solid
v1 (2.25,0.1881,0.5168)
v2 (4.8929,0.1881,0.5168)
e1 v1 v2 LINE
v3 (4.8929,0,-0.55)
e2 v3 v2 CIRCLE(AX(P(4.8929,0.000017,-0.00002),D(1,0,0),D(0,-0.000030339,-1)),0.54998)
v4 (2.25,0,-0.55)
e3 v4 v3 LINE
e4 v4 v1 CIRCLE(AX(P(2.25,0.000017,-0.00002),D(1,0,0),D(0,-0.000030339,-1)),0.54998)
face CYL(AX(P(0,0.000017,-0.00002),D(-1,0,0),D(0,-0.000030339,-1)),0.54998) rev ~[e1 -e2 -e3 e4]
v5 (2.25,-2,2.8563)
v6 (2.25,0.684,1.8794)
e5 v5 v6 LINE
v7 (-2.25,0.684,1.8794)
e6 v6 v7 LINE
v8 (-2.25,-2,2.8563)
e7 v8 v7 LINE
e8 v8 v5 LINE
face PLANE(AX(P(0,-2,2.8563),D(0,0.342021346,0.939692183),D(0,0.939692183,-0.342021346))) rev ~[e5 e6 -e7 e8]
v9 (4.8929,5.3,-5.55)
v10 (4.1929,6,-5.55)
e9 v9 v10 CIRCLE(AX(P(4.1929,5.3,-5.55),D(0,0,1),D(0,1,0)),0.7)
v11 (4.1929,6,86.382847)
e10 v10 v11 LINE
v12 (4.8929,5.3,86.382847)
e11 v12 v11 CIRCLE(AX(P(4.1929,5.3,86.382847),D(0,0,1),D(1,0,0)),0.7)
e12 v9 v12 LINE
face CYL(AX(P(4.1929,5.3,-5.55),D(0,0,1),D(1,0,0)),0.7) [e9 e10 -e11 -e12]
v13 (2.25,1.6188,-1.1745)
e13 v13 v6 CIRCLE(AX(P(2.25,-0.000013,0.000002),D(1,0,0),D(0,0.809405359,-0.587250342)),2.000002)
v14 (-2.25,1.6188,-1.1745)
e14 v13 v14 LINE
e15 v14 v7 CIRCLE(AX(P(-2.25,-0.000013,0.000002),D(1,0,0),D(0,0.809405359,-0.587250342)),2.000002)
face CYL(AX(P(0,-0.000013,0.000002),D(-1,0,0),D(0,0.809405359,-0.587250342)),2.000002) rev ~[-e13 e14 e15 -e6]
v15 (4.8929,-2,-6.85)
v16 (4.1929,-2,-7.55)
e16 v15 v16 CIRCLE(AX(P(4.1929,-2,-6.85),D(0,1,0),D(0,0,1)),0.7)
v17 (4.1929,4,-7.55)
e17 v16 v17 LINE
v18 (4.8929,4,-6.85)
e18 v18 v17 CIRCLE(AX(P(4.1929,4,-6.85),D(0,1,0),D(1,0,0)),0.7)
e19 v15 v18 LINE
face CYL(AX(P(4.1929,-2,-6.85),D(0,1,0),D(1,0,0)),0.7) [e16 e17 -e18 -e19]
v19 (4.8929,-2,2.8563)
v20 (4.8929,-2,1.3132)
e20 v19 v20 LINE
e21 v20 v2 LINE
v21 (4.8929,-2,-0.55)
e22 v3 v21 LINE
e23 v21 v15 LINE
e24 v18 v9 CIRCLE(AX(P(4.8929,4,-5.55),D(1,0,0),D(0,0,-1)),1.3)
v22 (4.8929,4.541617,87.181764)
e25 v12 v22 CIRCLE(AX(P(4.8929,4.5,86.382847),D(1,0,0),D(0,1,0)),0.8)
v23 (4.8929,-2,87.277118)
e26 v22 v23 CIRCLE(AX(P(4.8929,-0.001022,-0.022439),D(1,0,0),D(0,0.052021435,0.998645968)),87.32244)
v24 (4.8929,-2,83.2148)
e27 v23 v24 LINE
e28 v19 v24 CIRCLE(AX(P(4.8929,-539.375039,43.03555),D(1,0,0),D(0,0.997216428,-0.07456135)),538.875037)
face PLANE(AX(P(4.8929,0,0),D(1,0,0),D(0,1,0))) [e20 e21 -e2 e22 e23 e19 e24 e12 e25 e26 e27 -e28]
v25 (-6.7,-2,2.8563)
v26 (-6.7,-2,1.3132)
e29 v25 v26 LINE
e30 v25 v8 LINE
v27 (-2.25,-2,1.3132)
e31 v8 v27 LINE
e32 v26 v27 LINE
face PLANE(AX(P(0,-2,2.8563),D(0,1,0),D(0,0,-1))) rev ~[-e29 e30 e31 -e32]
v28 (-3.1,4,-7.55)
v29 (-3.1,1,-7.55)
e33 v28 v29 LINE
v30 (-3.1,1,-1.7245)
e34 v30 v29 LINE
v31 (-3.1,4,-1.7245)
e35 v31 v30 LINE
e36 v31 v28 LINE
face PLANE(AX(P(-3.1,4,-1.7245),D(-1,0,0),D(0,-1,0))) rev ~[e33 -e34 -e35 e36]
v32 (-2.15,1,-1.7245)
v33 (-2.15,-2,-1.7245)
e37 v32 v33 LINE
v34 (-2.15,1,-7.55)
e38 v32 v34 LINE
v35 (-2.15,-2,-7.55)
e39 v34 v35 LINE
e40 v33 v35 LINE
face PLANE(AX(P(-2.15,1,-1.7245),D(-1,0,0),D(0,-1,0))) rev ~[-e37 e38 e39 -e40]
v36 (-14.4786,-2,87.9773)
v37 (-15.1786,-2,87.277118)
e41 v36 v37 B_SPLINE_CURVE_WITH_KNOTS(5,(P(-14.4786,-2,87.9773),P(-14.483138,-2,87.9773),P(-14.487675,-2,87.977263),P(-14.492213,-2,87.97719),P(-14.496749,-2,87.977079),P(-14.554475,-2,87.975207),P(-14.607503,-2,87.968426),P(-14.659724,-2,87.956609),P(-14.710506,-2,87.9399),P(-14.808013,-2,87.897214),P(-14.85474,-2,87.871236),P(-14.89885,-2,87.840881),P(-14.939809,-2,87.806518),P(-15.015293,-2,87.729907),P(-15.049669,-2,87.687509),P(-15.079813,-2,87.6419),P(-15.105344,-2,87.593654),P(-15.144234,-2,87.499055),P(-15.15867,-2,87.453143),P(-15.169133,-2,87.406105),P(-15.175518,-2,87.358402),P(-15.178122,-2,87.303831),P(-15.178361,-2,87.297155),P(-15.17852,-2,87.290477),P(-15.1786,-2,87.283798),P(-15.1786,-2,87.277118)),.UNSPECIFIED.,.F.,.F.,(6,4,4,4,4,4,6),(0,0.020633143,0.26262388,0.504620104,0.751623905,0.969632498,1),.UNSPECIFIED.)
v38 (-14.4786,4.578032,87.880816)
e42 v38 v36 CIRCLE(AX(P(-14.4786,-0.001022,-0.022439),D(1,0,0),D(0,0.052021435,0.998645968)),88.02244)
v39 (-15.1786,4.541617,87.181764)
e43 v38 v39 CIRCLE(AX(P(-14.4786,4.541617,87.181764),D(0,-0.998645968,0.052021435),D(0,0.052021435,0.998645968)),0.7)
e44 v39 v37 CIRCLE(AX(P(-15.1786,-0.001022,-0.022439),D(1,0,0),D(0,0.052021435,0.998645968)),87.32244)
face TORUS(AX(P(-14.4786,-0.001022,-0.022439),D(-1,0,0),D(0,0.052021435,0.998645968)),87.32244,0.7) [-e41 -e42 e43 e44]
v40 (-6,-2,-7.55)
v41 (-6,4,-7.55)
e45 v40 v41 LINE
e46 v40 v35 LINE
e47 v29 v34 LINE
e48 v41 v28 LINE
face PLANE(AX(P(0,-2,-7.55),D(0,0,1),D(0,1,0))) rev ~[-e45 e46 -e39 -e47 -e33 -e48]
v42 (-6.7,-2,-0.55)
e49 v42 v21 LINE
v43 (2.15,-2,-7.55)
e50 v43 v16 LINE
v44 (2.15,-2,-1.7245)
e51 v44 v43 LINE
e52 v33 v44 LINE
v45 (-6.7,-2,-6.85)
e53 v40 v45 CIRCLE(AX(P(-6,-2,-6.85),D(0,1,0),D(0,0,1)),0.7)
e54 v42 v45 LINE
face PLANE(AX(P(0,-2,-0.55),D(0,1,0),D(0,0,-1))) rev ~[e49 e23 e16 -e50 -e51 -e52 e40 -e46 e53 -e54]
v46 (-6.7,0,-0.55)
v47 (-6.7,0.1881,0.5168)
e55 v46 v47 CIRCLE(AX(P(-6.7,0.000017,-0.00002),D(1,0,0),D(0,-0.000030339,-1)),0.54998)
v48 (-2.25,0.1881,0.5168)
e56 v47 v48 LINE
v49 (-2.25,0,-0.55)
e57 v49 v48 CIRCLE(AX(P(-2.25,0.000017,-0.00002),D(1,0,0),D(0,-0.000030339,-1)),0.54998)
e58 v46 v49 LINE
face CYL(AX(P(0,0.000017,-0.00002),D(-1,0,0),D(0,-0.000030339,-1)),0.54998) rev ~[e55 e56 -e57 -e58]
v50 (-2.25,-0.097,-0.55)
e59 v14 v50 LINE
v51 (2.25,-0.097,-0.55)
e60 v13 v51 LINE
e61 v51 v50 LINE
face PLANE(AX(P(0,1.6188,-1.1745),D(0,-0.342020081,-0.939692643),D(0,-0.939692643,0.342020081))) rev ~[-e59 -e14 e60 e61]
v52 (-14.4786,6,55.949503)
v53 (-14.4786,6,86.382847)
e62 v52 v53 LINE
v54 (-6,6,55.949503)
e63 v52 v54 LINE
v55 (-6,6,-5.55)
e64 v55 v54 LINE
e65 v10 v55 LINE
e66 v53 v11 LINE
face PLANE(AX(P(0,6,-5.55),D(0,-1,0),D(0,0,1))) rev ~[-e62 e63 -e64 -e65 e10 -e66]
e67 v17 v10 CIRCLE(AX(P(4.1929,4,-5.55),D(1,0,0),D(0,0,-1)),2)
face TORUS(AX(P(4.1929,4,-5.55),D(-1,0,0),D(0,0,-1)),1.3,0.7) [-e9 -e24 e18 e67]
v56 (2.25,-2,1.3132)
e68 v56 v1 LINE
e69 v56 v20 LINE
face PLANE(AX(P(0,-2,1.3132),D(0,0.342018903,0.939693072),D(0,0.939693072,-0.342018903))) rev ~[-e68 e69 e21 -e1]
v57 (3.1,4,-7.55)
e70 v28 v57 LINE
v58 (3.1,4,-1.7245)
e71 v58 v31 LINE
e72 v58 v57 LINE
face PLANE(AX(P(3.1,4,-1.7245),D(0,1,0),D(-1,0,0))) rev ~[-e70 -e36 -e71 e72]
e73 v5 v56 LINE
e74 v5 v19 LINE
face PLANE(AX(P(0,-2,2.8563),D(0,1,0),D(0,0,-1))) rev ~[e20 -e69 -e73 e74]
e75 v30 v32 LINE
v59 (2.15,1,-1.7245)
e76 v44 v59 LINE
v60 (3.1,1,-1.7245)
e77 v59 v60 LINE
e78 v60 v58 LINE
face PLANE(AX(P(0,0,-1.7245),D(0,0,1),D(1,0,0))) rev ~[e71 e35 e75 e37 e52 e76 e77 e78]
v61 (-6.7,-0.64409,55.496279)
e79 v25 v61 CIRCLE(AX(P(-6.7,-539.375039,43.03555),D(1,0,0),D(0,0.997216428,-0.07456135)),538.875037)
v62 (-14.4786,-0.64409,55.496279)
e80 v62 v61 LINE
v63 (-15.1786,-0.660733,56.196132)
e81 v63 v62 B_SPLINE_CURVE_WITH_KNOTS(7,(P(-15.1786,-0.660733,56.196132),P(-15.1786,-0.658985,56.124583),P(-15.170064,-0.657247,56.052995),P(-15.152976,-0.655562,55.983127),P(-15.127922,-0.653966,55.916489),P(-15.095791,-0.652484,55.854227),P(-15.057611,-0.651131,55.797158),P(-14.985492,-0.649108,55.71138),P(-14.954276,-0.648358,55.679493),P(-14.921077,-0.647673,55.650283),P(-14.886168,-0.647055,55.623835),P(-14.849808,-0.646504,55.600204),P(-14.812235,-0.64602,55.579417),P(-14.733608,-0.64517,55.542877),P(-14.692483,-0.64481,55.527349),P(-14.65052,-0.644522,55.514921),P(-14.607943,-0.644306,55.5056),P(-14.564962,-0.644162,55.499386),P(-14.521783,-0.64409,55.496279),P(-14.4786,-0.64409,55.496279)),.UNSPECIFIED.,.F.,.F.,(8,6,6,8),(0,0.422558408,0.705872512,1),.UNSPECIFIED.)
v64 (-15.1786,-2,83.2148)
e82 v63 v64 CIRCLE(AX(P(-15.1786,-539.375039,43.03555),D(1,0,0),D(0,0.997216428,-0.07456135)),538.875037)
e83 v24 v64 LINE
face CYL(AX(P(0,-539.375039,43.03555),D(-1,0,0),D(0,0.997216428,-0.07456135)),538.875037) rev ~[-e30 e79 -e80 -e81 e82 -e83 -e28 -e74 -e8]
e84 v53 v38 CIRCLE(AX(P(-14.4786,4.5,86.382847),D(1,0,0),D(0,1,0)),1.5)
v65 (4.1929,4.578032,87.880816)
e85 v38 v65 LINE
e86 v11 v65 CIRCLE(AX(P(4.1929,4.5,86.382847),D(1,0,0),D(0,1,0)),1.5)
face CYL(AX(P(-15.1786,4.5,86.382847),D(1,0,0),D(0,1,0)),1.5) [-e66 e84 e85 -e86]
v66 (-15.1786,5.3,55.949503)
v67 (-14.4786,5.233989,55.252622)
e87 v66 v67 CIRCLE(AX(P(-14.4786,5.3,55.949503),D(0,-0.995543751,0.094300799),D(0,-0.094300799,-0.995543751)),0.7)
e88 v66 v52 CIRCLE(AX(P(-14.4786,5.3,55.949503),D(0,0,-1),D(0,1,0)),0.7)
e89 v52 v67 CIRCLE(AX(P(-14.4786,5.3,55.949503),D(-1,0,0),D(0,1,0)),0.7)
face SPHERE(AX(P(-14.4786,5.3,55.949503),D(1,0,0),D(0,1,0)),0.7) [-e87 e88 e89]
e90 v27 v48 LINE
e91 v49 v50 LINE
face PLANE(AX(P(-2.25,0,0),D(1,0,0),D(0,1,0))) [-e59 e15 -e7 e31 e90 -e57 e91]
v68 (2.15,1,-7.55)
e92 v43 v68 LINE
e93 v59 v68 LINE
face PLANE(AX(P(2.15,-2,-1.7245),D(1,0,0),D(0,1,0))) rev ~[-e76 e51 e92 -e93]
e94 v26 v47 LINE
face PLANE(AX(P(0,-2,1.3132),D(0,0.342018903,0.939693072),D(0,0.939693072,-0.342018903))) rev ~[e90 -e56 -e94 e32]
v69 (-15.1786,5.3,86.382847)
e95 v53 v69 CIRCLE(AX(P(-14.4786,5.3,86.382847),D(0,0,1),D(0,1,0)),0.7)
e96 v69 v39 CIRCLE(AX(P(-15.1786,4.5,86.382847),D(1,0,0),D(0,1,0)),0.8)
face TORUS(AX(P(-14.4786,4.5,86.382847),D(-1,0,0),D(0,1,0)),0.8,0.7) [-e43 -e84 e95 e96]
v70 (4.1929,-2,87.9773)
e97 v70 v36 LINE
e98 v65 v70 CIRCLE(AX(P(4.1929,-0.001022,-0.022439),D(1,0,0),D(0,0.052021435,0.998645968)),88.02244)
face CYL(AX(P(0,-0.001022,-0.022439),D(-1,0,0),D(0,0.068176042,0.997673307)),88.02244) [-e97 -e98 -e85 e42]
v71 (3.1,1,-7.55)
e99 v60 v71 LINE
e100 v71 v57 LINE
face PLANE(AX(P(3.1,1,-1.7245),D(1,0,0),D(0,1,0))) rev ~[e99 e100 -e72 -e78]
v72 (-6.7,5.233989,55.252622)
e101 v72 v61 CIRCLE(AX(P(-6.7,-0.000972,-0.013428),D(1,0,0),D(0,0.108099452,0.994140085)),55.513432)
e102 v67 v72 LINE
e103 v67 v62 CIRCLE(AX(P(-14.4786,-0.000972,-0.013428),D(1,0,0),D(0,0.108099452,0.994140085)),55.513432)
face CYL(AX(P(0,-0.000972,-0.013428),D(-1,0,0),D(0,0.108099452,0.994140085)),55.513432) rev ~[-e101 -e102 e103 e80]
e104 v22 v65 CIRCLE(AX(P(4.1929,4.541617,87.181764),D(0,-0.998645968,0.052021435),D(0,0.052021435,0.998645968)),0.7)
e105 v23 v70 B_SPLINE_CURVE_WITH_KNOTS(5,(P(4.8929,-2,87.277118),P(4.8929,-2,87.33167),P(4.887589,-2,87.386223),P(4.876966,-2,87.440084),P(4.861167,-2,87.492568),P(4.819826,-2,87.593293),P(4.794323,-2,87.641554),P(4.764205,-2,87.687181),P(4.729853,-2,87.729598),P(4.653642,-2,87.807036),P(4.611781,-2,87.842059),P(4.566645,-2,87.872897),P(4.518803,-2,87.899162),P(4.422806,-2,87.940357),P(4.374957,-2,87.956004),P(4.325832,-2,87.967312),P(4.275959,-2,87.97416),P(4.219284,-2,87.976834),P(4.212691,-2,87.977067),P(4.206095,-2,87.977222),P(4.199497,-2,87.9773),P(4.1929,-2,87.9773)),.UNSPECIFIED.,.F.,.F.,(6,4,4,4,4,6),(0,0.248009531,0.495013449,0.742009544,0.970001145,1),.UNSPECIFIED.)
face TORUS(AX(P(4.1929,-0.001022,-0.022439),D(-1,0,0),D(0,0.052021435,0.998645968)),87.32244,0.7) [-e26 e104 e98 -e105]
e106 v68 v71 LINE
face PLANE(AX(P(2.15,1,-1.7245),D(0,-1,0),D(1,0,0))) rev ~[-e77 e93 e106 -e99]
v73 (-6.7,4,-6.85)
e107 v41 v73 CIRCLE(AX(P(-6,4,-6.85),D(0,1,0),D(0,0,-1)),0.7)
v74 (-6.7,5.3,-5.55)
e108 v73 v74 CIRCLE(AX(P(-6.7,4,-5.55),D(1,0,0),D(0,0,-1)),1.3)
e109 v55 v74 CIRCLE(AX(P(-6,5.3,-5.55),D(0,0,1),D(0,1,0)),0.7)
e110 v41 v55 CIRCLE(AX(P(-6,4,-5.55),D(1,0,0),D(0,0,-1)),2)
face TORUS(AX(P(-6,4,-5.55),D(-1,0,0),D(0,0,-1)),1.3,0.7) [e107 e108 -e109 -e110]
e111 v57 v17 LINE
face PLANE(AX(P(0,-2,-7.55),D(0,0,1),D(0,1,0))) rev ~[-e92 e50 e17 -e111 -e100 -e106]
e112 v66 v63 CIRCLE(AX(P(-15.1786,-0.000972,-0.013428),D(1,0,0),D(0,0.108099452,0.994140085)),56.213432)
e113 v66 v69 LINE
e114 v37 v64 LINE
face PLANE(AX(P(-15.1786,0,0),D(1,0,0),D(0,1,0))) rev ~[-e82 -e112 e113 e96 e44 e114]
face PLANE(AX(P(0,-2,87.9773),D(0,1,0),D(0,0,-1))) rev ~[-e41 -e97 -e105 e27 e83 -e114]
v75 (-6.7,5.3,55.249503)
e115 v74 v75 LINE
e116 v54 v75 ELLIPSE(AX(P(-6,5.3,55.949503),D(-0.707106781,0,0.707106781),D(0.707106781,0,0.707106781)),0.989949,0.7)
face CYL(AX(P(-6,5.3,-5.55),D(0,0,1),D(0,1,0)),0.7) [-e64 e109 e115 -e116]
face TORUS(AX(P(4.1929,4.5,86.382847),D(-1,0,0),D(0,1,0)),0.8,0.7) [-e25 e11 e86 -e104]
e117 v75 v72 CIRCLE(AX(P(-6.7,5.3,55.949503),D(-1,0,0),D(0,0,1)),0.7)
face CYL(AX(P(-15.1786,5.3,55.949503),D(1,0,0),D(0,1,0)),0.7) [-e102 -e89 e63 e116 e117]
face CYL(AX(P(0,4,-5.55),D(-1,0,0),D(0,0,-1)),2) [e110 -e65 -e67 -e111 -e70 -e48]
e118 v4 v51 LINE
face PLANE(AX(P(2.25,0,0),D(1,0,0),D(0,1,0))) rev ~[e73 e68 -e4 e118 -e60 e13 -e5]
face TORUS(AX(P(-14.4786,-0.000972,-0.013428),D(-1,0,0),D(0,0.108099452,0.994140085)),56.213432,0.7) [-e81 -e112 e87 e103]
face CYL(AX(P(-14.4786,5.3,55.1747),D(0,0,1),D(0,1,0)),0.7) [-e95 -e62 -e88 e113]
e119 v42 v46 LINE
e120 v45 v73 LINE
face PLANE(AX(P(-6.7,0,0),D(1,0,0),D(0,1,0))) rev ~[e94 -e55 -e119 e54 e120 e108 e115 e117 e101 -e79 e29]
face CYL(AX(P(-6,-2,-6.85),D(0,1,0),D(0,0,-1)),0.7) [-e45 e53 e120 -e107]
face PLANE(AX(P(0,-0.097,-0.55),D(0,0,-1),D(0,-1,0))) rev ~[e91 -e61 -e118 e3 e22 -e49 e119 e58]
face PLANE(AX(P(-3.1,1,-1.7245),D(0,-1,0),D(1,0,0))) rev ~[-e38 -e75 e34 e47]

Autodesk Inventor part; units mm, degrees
ref_plane "YZ Plane" through (0, 0, 0) normal (1, 0, 0) x (0, 1, 0)
ref_plane "XZ Plane" through (0, 0, 0) normal (0, 1, 0) x (-1, 0, 0)
ref_plane "Slot Start Plane" through (0, 0, -1.7245) normal (0, 0, 1) x (1, 0, 0)
sketch "Key Profile" plane through (0, 0, 0) normal (1, 0, 0) x (0, 1, 0)
  line L0 (-2, 2.8563) -> (0.684, 1.8794)
  arc A0 (1.6188, -1.1745) -> (0.684, 1.8794) centre (0, 0) ccw
  line L1 (-2, 1.3132) -> (0.1881, 0.5168)
  arc A1 (0, -0.55) -> (0.1881, 0.5168) centre (0, 0) ccw
  line L2 (-2, 2.8563) -> (-2, -0.55)
  line L3 (0, 0) -> (-2, 0) construction
  line L4 (0, -0.55) -> (-2, -0.55)
  line L5 (1.6188, -1.1745) -> (-0.097, -0.55)
  line L6 (6, -5.55) -> (6, 87.7952)
  line L7 (-2, 87.9773) -> (-2, 2.8563)
  arc A2 (6, 87.7952) -> (-2, 87.9773) centre (0, 0) ccw
  line L8 (-2, -0.55) -> (-2, -7.55)
  arc A3 (4, -7.55) -> (6, -5.55) centre (4, -5.55) ccw
  line L9 (-2, -7.55) -> (4, -7.55)
  arc A4 (6, 55.1747) -> (-2, 55.464) centre (0, 0) ccw
  arc A5 (-2, 2.8563) -> (-2, 83.2148) centre (-539.3737, 43.0355) ccw
  point P0 (-0.5, 43.0355)
  point P1 (-0.6441, 55.4963)
  dimension "my_hingeCutRad" = 0.55
  dimension "my_hingeDepth" = 2
  dimension "my_hingeRegCutRad" = 2
  dimension "keyLength" = 88
  dimension "my_KeyHeight" = 8
  dimension "d107" = 20
  dimension "d122" = 4
  dimension "slotOffset" = 1.1745
  dimension "my_backWidth" = 7
  dimension "d128" = 55.5
  dimension "d135" = 1.5
  dimension "d136" = 4.7625
extrude "Upper (u)" add sketch "Key Profile" along normal blind 4.8929 and the other way blind 6.7 contours A5 A4 L6 A3 L9 L8 L4 L5 A0 L0 | L0 A0 L5 L4 A1 L1 L2
extrude "Lower (d)" add sketch "Key Profile" along normal blind 4.8929 and the other way blind 15.1786 contours A5 L7 A2 L6 A4
extrude "Protrusion Cutout" cut sketch "Key Profile" along normal mid plane 4.5 contours L0 A0 L5 L4 A1 L1 L2
fillet "Front Fillet" radius 1.5 1 edges at (-5.1429, 6, 87.7952)
sketch "Slot Sketch" plane through (0, 0, -1.7245) normal (0, 0, 1) x (1, 0, 0)
  line L0 (2.15, -2) -> (2.15, 1)
  line L1 (3.1, 4) -> (-3.1, 4)
  line L2 (-2.15, 1) -> (-2.15, -2)
  line L3 (-2.15, -2) -> (2.15, -2)
  line L4 (0, -2) -> (0, 4) construction
  line L5 (-3.1, 4) -> (-3.1, 1)
  line L6 (-3.1, 1) -> (-2.15, 1)
  line L7 (2.15, 1) -> (3.1, 1)
  line L8 (3.1, 1) -> (3.1, 4)
  point P0 (0, 0)
  dimension "d109" = 2
  dimension "my_slotHeadOffset" = 1
  dimension "my_slotHeadHeight" = 3
  dimension "my_slotHeadWidth" = 6.2
  dimension "my_neckSlotWidth" = 4.3
extrude "Slot" cut sketch "Slot Sketch" against normal through all
fillet "Edge Softening" radius 0.7 13 edges at (4.8929, 5.4142, -6.9642) (4.8929, 1, -7.55) (4.8929, 6, 40.4164) (-6.7, 5.4142, -6.9642) (-6.7, 1, -7.55) (-6.7, 6, 24.8124) (-15.1786, 5.5879, 87.4156) (-15.1786, 1.2899, 87.9905) (-15.1786, 6, 70.7788) (4.8929, 5.5879, 87.4156) (4.8929, 1.2899, 87.9905) (-15.1786, 2.6828, 55.4351) (-10.9393, 6, 55.1747)
equation "\"my_headHeight\" = 3"
equation "\"my_headOffset\" = 1"
equation "\"whiteKeyWidth\" = 20.07143"
properties part number "BKey0"
